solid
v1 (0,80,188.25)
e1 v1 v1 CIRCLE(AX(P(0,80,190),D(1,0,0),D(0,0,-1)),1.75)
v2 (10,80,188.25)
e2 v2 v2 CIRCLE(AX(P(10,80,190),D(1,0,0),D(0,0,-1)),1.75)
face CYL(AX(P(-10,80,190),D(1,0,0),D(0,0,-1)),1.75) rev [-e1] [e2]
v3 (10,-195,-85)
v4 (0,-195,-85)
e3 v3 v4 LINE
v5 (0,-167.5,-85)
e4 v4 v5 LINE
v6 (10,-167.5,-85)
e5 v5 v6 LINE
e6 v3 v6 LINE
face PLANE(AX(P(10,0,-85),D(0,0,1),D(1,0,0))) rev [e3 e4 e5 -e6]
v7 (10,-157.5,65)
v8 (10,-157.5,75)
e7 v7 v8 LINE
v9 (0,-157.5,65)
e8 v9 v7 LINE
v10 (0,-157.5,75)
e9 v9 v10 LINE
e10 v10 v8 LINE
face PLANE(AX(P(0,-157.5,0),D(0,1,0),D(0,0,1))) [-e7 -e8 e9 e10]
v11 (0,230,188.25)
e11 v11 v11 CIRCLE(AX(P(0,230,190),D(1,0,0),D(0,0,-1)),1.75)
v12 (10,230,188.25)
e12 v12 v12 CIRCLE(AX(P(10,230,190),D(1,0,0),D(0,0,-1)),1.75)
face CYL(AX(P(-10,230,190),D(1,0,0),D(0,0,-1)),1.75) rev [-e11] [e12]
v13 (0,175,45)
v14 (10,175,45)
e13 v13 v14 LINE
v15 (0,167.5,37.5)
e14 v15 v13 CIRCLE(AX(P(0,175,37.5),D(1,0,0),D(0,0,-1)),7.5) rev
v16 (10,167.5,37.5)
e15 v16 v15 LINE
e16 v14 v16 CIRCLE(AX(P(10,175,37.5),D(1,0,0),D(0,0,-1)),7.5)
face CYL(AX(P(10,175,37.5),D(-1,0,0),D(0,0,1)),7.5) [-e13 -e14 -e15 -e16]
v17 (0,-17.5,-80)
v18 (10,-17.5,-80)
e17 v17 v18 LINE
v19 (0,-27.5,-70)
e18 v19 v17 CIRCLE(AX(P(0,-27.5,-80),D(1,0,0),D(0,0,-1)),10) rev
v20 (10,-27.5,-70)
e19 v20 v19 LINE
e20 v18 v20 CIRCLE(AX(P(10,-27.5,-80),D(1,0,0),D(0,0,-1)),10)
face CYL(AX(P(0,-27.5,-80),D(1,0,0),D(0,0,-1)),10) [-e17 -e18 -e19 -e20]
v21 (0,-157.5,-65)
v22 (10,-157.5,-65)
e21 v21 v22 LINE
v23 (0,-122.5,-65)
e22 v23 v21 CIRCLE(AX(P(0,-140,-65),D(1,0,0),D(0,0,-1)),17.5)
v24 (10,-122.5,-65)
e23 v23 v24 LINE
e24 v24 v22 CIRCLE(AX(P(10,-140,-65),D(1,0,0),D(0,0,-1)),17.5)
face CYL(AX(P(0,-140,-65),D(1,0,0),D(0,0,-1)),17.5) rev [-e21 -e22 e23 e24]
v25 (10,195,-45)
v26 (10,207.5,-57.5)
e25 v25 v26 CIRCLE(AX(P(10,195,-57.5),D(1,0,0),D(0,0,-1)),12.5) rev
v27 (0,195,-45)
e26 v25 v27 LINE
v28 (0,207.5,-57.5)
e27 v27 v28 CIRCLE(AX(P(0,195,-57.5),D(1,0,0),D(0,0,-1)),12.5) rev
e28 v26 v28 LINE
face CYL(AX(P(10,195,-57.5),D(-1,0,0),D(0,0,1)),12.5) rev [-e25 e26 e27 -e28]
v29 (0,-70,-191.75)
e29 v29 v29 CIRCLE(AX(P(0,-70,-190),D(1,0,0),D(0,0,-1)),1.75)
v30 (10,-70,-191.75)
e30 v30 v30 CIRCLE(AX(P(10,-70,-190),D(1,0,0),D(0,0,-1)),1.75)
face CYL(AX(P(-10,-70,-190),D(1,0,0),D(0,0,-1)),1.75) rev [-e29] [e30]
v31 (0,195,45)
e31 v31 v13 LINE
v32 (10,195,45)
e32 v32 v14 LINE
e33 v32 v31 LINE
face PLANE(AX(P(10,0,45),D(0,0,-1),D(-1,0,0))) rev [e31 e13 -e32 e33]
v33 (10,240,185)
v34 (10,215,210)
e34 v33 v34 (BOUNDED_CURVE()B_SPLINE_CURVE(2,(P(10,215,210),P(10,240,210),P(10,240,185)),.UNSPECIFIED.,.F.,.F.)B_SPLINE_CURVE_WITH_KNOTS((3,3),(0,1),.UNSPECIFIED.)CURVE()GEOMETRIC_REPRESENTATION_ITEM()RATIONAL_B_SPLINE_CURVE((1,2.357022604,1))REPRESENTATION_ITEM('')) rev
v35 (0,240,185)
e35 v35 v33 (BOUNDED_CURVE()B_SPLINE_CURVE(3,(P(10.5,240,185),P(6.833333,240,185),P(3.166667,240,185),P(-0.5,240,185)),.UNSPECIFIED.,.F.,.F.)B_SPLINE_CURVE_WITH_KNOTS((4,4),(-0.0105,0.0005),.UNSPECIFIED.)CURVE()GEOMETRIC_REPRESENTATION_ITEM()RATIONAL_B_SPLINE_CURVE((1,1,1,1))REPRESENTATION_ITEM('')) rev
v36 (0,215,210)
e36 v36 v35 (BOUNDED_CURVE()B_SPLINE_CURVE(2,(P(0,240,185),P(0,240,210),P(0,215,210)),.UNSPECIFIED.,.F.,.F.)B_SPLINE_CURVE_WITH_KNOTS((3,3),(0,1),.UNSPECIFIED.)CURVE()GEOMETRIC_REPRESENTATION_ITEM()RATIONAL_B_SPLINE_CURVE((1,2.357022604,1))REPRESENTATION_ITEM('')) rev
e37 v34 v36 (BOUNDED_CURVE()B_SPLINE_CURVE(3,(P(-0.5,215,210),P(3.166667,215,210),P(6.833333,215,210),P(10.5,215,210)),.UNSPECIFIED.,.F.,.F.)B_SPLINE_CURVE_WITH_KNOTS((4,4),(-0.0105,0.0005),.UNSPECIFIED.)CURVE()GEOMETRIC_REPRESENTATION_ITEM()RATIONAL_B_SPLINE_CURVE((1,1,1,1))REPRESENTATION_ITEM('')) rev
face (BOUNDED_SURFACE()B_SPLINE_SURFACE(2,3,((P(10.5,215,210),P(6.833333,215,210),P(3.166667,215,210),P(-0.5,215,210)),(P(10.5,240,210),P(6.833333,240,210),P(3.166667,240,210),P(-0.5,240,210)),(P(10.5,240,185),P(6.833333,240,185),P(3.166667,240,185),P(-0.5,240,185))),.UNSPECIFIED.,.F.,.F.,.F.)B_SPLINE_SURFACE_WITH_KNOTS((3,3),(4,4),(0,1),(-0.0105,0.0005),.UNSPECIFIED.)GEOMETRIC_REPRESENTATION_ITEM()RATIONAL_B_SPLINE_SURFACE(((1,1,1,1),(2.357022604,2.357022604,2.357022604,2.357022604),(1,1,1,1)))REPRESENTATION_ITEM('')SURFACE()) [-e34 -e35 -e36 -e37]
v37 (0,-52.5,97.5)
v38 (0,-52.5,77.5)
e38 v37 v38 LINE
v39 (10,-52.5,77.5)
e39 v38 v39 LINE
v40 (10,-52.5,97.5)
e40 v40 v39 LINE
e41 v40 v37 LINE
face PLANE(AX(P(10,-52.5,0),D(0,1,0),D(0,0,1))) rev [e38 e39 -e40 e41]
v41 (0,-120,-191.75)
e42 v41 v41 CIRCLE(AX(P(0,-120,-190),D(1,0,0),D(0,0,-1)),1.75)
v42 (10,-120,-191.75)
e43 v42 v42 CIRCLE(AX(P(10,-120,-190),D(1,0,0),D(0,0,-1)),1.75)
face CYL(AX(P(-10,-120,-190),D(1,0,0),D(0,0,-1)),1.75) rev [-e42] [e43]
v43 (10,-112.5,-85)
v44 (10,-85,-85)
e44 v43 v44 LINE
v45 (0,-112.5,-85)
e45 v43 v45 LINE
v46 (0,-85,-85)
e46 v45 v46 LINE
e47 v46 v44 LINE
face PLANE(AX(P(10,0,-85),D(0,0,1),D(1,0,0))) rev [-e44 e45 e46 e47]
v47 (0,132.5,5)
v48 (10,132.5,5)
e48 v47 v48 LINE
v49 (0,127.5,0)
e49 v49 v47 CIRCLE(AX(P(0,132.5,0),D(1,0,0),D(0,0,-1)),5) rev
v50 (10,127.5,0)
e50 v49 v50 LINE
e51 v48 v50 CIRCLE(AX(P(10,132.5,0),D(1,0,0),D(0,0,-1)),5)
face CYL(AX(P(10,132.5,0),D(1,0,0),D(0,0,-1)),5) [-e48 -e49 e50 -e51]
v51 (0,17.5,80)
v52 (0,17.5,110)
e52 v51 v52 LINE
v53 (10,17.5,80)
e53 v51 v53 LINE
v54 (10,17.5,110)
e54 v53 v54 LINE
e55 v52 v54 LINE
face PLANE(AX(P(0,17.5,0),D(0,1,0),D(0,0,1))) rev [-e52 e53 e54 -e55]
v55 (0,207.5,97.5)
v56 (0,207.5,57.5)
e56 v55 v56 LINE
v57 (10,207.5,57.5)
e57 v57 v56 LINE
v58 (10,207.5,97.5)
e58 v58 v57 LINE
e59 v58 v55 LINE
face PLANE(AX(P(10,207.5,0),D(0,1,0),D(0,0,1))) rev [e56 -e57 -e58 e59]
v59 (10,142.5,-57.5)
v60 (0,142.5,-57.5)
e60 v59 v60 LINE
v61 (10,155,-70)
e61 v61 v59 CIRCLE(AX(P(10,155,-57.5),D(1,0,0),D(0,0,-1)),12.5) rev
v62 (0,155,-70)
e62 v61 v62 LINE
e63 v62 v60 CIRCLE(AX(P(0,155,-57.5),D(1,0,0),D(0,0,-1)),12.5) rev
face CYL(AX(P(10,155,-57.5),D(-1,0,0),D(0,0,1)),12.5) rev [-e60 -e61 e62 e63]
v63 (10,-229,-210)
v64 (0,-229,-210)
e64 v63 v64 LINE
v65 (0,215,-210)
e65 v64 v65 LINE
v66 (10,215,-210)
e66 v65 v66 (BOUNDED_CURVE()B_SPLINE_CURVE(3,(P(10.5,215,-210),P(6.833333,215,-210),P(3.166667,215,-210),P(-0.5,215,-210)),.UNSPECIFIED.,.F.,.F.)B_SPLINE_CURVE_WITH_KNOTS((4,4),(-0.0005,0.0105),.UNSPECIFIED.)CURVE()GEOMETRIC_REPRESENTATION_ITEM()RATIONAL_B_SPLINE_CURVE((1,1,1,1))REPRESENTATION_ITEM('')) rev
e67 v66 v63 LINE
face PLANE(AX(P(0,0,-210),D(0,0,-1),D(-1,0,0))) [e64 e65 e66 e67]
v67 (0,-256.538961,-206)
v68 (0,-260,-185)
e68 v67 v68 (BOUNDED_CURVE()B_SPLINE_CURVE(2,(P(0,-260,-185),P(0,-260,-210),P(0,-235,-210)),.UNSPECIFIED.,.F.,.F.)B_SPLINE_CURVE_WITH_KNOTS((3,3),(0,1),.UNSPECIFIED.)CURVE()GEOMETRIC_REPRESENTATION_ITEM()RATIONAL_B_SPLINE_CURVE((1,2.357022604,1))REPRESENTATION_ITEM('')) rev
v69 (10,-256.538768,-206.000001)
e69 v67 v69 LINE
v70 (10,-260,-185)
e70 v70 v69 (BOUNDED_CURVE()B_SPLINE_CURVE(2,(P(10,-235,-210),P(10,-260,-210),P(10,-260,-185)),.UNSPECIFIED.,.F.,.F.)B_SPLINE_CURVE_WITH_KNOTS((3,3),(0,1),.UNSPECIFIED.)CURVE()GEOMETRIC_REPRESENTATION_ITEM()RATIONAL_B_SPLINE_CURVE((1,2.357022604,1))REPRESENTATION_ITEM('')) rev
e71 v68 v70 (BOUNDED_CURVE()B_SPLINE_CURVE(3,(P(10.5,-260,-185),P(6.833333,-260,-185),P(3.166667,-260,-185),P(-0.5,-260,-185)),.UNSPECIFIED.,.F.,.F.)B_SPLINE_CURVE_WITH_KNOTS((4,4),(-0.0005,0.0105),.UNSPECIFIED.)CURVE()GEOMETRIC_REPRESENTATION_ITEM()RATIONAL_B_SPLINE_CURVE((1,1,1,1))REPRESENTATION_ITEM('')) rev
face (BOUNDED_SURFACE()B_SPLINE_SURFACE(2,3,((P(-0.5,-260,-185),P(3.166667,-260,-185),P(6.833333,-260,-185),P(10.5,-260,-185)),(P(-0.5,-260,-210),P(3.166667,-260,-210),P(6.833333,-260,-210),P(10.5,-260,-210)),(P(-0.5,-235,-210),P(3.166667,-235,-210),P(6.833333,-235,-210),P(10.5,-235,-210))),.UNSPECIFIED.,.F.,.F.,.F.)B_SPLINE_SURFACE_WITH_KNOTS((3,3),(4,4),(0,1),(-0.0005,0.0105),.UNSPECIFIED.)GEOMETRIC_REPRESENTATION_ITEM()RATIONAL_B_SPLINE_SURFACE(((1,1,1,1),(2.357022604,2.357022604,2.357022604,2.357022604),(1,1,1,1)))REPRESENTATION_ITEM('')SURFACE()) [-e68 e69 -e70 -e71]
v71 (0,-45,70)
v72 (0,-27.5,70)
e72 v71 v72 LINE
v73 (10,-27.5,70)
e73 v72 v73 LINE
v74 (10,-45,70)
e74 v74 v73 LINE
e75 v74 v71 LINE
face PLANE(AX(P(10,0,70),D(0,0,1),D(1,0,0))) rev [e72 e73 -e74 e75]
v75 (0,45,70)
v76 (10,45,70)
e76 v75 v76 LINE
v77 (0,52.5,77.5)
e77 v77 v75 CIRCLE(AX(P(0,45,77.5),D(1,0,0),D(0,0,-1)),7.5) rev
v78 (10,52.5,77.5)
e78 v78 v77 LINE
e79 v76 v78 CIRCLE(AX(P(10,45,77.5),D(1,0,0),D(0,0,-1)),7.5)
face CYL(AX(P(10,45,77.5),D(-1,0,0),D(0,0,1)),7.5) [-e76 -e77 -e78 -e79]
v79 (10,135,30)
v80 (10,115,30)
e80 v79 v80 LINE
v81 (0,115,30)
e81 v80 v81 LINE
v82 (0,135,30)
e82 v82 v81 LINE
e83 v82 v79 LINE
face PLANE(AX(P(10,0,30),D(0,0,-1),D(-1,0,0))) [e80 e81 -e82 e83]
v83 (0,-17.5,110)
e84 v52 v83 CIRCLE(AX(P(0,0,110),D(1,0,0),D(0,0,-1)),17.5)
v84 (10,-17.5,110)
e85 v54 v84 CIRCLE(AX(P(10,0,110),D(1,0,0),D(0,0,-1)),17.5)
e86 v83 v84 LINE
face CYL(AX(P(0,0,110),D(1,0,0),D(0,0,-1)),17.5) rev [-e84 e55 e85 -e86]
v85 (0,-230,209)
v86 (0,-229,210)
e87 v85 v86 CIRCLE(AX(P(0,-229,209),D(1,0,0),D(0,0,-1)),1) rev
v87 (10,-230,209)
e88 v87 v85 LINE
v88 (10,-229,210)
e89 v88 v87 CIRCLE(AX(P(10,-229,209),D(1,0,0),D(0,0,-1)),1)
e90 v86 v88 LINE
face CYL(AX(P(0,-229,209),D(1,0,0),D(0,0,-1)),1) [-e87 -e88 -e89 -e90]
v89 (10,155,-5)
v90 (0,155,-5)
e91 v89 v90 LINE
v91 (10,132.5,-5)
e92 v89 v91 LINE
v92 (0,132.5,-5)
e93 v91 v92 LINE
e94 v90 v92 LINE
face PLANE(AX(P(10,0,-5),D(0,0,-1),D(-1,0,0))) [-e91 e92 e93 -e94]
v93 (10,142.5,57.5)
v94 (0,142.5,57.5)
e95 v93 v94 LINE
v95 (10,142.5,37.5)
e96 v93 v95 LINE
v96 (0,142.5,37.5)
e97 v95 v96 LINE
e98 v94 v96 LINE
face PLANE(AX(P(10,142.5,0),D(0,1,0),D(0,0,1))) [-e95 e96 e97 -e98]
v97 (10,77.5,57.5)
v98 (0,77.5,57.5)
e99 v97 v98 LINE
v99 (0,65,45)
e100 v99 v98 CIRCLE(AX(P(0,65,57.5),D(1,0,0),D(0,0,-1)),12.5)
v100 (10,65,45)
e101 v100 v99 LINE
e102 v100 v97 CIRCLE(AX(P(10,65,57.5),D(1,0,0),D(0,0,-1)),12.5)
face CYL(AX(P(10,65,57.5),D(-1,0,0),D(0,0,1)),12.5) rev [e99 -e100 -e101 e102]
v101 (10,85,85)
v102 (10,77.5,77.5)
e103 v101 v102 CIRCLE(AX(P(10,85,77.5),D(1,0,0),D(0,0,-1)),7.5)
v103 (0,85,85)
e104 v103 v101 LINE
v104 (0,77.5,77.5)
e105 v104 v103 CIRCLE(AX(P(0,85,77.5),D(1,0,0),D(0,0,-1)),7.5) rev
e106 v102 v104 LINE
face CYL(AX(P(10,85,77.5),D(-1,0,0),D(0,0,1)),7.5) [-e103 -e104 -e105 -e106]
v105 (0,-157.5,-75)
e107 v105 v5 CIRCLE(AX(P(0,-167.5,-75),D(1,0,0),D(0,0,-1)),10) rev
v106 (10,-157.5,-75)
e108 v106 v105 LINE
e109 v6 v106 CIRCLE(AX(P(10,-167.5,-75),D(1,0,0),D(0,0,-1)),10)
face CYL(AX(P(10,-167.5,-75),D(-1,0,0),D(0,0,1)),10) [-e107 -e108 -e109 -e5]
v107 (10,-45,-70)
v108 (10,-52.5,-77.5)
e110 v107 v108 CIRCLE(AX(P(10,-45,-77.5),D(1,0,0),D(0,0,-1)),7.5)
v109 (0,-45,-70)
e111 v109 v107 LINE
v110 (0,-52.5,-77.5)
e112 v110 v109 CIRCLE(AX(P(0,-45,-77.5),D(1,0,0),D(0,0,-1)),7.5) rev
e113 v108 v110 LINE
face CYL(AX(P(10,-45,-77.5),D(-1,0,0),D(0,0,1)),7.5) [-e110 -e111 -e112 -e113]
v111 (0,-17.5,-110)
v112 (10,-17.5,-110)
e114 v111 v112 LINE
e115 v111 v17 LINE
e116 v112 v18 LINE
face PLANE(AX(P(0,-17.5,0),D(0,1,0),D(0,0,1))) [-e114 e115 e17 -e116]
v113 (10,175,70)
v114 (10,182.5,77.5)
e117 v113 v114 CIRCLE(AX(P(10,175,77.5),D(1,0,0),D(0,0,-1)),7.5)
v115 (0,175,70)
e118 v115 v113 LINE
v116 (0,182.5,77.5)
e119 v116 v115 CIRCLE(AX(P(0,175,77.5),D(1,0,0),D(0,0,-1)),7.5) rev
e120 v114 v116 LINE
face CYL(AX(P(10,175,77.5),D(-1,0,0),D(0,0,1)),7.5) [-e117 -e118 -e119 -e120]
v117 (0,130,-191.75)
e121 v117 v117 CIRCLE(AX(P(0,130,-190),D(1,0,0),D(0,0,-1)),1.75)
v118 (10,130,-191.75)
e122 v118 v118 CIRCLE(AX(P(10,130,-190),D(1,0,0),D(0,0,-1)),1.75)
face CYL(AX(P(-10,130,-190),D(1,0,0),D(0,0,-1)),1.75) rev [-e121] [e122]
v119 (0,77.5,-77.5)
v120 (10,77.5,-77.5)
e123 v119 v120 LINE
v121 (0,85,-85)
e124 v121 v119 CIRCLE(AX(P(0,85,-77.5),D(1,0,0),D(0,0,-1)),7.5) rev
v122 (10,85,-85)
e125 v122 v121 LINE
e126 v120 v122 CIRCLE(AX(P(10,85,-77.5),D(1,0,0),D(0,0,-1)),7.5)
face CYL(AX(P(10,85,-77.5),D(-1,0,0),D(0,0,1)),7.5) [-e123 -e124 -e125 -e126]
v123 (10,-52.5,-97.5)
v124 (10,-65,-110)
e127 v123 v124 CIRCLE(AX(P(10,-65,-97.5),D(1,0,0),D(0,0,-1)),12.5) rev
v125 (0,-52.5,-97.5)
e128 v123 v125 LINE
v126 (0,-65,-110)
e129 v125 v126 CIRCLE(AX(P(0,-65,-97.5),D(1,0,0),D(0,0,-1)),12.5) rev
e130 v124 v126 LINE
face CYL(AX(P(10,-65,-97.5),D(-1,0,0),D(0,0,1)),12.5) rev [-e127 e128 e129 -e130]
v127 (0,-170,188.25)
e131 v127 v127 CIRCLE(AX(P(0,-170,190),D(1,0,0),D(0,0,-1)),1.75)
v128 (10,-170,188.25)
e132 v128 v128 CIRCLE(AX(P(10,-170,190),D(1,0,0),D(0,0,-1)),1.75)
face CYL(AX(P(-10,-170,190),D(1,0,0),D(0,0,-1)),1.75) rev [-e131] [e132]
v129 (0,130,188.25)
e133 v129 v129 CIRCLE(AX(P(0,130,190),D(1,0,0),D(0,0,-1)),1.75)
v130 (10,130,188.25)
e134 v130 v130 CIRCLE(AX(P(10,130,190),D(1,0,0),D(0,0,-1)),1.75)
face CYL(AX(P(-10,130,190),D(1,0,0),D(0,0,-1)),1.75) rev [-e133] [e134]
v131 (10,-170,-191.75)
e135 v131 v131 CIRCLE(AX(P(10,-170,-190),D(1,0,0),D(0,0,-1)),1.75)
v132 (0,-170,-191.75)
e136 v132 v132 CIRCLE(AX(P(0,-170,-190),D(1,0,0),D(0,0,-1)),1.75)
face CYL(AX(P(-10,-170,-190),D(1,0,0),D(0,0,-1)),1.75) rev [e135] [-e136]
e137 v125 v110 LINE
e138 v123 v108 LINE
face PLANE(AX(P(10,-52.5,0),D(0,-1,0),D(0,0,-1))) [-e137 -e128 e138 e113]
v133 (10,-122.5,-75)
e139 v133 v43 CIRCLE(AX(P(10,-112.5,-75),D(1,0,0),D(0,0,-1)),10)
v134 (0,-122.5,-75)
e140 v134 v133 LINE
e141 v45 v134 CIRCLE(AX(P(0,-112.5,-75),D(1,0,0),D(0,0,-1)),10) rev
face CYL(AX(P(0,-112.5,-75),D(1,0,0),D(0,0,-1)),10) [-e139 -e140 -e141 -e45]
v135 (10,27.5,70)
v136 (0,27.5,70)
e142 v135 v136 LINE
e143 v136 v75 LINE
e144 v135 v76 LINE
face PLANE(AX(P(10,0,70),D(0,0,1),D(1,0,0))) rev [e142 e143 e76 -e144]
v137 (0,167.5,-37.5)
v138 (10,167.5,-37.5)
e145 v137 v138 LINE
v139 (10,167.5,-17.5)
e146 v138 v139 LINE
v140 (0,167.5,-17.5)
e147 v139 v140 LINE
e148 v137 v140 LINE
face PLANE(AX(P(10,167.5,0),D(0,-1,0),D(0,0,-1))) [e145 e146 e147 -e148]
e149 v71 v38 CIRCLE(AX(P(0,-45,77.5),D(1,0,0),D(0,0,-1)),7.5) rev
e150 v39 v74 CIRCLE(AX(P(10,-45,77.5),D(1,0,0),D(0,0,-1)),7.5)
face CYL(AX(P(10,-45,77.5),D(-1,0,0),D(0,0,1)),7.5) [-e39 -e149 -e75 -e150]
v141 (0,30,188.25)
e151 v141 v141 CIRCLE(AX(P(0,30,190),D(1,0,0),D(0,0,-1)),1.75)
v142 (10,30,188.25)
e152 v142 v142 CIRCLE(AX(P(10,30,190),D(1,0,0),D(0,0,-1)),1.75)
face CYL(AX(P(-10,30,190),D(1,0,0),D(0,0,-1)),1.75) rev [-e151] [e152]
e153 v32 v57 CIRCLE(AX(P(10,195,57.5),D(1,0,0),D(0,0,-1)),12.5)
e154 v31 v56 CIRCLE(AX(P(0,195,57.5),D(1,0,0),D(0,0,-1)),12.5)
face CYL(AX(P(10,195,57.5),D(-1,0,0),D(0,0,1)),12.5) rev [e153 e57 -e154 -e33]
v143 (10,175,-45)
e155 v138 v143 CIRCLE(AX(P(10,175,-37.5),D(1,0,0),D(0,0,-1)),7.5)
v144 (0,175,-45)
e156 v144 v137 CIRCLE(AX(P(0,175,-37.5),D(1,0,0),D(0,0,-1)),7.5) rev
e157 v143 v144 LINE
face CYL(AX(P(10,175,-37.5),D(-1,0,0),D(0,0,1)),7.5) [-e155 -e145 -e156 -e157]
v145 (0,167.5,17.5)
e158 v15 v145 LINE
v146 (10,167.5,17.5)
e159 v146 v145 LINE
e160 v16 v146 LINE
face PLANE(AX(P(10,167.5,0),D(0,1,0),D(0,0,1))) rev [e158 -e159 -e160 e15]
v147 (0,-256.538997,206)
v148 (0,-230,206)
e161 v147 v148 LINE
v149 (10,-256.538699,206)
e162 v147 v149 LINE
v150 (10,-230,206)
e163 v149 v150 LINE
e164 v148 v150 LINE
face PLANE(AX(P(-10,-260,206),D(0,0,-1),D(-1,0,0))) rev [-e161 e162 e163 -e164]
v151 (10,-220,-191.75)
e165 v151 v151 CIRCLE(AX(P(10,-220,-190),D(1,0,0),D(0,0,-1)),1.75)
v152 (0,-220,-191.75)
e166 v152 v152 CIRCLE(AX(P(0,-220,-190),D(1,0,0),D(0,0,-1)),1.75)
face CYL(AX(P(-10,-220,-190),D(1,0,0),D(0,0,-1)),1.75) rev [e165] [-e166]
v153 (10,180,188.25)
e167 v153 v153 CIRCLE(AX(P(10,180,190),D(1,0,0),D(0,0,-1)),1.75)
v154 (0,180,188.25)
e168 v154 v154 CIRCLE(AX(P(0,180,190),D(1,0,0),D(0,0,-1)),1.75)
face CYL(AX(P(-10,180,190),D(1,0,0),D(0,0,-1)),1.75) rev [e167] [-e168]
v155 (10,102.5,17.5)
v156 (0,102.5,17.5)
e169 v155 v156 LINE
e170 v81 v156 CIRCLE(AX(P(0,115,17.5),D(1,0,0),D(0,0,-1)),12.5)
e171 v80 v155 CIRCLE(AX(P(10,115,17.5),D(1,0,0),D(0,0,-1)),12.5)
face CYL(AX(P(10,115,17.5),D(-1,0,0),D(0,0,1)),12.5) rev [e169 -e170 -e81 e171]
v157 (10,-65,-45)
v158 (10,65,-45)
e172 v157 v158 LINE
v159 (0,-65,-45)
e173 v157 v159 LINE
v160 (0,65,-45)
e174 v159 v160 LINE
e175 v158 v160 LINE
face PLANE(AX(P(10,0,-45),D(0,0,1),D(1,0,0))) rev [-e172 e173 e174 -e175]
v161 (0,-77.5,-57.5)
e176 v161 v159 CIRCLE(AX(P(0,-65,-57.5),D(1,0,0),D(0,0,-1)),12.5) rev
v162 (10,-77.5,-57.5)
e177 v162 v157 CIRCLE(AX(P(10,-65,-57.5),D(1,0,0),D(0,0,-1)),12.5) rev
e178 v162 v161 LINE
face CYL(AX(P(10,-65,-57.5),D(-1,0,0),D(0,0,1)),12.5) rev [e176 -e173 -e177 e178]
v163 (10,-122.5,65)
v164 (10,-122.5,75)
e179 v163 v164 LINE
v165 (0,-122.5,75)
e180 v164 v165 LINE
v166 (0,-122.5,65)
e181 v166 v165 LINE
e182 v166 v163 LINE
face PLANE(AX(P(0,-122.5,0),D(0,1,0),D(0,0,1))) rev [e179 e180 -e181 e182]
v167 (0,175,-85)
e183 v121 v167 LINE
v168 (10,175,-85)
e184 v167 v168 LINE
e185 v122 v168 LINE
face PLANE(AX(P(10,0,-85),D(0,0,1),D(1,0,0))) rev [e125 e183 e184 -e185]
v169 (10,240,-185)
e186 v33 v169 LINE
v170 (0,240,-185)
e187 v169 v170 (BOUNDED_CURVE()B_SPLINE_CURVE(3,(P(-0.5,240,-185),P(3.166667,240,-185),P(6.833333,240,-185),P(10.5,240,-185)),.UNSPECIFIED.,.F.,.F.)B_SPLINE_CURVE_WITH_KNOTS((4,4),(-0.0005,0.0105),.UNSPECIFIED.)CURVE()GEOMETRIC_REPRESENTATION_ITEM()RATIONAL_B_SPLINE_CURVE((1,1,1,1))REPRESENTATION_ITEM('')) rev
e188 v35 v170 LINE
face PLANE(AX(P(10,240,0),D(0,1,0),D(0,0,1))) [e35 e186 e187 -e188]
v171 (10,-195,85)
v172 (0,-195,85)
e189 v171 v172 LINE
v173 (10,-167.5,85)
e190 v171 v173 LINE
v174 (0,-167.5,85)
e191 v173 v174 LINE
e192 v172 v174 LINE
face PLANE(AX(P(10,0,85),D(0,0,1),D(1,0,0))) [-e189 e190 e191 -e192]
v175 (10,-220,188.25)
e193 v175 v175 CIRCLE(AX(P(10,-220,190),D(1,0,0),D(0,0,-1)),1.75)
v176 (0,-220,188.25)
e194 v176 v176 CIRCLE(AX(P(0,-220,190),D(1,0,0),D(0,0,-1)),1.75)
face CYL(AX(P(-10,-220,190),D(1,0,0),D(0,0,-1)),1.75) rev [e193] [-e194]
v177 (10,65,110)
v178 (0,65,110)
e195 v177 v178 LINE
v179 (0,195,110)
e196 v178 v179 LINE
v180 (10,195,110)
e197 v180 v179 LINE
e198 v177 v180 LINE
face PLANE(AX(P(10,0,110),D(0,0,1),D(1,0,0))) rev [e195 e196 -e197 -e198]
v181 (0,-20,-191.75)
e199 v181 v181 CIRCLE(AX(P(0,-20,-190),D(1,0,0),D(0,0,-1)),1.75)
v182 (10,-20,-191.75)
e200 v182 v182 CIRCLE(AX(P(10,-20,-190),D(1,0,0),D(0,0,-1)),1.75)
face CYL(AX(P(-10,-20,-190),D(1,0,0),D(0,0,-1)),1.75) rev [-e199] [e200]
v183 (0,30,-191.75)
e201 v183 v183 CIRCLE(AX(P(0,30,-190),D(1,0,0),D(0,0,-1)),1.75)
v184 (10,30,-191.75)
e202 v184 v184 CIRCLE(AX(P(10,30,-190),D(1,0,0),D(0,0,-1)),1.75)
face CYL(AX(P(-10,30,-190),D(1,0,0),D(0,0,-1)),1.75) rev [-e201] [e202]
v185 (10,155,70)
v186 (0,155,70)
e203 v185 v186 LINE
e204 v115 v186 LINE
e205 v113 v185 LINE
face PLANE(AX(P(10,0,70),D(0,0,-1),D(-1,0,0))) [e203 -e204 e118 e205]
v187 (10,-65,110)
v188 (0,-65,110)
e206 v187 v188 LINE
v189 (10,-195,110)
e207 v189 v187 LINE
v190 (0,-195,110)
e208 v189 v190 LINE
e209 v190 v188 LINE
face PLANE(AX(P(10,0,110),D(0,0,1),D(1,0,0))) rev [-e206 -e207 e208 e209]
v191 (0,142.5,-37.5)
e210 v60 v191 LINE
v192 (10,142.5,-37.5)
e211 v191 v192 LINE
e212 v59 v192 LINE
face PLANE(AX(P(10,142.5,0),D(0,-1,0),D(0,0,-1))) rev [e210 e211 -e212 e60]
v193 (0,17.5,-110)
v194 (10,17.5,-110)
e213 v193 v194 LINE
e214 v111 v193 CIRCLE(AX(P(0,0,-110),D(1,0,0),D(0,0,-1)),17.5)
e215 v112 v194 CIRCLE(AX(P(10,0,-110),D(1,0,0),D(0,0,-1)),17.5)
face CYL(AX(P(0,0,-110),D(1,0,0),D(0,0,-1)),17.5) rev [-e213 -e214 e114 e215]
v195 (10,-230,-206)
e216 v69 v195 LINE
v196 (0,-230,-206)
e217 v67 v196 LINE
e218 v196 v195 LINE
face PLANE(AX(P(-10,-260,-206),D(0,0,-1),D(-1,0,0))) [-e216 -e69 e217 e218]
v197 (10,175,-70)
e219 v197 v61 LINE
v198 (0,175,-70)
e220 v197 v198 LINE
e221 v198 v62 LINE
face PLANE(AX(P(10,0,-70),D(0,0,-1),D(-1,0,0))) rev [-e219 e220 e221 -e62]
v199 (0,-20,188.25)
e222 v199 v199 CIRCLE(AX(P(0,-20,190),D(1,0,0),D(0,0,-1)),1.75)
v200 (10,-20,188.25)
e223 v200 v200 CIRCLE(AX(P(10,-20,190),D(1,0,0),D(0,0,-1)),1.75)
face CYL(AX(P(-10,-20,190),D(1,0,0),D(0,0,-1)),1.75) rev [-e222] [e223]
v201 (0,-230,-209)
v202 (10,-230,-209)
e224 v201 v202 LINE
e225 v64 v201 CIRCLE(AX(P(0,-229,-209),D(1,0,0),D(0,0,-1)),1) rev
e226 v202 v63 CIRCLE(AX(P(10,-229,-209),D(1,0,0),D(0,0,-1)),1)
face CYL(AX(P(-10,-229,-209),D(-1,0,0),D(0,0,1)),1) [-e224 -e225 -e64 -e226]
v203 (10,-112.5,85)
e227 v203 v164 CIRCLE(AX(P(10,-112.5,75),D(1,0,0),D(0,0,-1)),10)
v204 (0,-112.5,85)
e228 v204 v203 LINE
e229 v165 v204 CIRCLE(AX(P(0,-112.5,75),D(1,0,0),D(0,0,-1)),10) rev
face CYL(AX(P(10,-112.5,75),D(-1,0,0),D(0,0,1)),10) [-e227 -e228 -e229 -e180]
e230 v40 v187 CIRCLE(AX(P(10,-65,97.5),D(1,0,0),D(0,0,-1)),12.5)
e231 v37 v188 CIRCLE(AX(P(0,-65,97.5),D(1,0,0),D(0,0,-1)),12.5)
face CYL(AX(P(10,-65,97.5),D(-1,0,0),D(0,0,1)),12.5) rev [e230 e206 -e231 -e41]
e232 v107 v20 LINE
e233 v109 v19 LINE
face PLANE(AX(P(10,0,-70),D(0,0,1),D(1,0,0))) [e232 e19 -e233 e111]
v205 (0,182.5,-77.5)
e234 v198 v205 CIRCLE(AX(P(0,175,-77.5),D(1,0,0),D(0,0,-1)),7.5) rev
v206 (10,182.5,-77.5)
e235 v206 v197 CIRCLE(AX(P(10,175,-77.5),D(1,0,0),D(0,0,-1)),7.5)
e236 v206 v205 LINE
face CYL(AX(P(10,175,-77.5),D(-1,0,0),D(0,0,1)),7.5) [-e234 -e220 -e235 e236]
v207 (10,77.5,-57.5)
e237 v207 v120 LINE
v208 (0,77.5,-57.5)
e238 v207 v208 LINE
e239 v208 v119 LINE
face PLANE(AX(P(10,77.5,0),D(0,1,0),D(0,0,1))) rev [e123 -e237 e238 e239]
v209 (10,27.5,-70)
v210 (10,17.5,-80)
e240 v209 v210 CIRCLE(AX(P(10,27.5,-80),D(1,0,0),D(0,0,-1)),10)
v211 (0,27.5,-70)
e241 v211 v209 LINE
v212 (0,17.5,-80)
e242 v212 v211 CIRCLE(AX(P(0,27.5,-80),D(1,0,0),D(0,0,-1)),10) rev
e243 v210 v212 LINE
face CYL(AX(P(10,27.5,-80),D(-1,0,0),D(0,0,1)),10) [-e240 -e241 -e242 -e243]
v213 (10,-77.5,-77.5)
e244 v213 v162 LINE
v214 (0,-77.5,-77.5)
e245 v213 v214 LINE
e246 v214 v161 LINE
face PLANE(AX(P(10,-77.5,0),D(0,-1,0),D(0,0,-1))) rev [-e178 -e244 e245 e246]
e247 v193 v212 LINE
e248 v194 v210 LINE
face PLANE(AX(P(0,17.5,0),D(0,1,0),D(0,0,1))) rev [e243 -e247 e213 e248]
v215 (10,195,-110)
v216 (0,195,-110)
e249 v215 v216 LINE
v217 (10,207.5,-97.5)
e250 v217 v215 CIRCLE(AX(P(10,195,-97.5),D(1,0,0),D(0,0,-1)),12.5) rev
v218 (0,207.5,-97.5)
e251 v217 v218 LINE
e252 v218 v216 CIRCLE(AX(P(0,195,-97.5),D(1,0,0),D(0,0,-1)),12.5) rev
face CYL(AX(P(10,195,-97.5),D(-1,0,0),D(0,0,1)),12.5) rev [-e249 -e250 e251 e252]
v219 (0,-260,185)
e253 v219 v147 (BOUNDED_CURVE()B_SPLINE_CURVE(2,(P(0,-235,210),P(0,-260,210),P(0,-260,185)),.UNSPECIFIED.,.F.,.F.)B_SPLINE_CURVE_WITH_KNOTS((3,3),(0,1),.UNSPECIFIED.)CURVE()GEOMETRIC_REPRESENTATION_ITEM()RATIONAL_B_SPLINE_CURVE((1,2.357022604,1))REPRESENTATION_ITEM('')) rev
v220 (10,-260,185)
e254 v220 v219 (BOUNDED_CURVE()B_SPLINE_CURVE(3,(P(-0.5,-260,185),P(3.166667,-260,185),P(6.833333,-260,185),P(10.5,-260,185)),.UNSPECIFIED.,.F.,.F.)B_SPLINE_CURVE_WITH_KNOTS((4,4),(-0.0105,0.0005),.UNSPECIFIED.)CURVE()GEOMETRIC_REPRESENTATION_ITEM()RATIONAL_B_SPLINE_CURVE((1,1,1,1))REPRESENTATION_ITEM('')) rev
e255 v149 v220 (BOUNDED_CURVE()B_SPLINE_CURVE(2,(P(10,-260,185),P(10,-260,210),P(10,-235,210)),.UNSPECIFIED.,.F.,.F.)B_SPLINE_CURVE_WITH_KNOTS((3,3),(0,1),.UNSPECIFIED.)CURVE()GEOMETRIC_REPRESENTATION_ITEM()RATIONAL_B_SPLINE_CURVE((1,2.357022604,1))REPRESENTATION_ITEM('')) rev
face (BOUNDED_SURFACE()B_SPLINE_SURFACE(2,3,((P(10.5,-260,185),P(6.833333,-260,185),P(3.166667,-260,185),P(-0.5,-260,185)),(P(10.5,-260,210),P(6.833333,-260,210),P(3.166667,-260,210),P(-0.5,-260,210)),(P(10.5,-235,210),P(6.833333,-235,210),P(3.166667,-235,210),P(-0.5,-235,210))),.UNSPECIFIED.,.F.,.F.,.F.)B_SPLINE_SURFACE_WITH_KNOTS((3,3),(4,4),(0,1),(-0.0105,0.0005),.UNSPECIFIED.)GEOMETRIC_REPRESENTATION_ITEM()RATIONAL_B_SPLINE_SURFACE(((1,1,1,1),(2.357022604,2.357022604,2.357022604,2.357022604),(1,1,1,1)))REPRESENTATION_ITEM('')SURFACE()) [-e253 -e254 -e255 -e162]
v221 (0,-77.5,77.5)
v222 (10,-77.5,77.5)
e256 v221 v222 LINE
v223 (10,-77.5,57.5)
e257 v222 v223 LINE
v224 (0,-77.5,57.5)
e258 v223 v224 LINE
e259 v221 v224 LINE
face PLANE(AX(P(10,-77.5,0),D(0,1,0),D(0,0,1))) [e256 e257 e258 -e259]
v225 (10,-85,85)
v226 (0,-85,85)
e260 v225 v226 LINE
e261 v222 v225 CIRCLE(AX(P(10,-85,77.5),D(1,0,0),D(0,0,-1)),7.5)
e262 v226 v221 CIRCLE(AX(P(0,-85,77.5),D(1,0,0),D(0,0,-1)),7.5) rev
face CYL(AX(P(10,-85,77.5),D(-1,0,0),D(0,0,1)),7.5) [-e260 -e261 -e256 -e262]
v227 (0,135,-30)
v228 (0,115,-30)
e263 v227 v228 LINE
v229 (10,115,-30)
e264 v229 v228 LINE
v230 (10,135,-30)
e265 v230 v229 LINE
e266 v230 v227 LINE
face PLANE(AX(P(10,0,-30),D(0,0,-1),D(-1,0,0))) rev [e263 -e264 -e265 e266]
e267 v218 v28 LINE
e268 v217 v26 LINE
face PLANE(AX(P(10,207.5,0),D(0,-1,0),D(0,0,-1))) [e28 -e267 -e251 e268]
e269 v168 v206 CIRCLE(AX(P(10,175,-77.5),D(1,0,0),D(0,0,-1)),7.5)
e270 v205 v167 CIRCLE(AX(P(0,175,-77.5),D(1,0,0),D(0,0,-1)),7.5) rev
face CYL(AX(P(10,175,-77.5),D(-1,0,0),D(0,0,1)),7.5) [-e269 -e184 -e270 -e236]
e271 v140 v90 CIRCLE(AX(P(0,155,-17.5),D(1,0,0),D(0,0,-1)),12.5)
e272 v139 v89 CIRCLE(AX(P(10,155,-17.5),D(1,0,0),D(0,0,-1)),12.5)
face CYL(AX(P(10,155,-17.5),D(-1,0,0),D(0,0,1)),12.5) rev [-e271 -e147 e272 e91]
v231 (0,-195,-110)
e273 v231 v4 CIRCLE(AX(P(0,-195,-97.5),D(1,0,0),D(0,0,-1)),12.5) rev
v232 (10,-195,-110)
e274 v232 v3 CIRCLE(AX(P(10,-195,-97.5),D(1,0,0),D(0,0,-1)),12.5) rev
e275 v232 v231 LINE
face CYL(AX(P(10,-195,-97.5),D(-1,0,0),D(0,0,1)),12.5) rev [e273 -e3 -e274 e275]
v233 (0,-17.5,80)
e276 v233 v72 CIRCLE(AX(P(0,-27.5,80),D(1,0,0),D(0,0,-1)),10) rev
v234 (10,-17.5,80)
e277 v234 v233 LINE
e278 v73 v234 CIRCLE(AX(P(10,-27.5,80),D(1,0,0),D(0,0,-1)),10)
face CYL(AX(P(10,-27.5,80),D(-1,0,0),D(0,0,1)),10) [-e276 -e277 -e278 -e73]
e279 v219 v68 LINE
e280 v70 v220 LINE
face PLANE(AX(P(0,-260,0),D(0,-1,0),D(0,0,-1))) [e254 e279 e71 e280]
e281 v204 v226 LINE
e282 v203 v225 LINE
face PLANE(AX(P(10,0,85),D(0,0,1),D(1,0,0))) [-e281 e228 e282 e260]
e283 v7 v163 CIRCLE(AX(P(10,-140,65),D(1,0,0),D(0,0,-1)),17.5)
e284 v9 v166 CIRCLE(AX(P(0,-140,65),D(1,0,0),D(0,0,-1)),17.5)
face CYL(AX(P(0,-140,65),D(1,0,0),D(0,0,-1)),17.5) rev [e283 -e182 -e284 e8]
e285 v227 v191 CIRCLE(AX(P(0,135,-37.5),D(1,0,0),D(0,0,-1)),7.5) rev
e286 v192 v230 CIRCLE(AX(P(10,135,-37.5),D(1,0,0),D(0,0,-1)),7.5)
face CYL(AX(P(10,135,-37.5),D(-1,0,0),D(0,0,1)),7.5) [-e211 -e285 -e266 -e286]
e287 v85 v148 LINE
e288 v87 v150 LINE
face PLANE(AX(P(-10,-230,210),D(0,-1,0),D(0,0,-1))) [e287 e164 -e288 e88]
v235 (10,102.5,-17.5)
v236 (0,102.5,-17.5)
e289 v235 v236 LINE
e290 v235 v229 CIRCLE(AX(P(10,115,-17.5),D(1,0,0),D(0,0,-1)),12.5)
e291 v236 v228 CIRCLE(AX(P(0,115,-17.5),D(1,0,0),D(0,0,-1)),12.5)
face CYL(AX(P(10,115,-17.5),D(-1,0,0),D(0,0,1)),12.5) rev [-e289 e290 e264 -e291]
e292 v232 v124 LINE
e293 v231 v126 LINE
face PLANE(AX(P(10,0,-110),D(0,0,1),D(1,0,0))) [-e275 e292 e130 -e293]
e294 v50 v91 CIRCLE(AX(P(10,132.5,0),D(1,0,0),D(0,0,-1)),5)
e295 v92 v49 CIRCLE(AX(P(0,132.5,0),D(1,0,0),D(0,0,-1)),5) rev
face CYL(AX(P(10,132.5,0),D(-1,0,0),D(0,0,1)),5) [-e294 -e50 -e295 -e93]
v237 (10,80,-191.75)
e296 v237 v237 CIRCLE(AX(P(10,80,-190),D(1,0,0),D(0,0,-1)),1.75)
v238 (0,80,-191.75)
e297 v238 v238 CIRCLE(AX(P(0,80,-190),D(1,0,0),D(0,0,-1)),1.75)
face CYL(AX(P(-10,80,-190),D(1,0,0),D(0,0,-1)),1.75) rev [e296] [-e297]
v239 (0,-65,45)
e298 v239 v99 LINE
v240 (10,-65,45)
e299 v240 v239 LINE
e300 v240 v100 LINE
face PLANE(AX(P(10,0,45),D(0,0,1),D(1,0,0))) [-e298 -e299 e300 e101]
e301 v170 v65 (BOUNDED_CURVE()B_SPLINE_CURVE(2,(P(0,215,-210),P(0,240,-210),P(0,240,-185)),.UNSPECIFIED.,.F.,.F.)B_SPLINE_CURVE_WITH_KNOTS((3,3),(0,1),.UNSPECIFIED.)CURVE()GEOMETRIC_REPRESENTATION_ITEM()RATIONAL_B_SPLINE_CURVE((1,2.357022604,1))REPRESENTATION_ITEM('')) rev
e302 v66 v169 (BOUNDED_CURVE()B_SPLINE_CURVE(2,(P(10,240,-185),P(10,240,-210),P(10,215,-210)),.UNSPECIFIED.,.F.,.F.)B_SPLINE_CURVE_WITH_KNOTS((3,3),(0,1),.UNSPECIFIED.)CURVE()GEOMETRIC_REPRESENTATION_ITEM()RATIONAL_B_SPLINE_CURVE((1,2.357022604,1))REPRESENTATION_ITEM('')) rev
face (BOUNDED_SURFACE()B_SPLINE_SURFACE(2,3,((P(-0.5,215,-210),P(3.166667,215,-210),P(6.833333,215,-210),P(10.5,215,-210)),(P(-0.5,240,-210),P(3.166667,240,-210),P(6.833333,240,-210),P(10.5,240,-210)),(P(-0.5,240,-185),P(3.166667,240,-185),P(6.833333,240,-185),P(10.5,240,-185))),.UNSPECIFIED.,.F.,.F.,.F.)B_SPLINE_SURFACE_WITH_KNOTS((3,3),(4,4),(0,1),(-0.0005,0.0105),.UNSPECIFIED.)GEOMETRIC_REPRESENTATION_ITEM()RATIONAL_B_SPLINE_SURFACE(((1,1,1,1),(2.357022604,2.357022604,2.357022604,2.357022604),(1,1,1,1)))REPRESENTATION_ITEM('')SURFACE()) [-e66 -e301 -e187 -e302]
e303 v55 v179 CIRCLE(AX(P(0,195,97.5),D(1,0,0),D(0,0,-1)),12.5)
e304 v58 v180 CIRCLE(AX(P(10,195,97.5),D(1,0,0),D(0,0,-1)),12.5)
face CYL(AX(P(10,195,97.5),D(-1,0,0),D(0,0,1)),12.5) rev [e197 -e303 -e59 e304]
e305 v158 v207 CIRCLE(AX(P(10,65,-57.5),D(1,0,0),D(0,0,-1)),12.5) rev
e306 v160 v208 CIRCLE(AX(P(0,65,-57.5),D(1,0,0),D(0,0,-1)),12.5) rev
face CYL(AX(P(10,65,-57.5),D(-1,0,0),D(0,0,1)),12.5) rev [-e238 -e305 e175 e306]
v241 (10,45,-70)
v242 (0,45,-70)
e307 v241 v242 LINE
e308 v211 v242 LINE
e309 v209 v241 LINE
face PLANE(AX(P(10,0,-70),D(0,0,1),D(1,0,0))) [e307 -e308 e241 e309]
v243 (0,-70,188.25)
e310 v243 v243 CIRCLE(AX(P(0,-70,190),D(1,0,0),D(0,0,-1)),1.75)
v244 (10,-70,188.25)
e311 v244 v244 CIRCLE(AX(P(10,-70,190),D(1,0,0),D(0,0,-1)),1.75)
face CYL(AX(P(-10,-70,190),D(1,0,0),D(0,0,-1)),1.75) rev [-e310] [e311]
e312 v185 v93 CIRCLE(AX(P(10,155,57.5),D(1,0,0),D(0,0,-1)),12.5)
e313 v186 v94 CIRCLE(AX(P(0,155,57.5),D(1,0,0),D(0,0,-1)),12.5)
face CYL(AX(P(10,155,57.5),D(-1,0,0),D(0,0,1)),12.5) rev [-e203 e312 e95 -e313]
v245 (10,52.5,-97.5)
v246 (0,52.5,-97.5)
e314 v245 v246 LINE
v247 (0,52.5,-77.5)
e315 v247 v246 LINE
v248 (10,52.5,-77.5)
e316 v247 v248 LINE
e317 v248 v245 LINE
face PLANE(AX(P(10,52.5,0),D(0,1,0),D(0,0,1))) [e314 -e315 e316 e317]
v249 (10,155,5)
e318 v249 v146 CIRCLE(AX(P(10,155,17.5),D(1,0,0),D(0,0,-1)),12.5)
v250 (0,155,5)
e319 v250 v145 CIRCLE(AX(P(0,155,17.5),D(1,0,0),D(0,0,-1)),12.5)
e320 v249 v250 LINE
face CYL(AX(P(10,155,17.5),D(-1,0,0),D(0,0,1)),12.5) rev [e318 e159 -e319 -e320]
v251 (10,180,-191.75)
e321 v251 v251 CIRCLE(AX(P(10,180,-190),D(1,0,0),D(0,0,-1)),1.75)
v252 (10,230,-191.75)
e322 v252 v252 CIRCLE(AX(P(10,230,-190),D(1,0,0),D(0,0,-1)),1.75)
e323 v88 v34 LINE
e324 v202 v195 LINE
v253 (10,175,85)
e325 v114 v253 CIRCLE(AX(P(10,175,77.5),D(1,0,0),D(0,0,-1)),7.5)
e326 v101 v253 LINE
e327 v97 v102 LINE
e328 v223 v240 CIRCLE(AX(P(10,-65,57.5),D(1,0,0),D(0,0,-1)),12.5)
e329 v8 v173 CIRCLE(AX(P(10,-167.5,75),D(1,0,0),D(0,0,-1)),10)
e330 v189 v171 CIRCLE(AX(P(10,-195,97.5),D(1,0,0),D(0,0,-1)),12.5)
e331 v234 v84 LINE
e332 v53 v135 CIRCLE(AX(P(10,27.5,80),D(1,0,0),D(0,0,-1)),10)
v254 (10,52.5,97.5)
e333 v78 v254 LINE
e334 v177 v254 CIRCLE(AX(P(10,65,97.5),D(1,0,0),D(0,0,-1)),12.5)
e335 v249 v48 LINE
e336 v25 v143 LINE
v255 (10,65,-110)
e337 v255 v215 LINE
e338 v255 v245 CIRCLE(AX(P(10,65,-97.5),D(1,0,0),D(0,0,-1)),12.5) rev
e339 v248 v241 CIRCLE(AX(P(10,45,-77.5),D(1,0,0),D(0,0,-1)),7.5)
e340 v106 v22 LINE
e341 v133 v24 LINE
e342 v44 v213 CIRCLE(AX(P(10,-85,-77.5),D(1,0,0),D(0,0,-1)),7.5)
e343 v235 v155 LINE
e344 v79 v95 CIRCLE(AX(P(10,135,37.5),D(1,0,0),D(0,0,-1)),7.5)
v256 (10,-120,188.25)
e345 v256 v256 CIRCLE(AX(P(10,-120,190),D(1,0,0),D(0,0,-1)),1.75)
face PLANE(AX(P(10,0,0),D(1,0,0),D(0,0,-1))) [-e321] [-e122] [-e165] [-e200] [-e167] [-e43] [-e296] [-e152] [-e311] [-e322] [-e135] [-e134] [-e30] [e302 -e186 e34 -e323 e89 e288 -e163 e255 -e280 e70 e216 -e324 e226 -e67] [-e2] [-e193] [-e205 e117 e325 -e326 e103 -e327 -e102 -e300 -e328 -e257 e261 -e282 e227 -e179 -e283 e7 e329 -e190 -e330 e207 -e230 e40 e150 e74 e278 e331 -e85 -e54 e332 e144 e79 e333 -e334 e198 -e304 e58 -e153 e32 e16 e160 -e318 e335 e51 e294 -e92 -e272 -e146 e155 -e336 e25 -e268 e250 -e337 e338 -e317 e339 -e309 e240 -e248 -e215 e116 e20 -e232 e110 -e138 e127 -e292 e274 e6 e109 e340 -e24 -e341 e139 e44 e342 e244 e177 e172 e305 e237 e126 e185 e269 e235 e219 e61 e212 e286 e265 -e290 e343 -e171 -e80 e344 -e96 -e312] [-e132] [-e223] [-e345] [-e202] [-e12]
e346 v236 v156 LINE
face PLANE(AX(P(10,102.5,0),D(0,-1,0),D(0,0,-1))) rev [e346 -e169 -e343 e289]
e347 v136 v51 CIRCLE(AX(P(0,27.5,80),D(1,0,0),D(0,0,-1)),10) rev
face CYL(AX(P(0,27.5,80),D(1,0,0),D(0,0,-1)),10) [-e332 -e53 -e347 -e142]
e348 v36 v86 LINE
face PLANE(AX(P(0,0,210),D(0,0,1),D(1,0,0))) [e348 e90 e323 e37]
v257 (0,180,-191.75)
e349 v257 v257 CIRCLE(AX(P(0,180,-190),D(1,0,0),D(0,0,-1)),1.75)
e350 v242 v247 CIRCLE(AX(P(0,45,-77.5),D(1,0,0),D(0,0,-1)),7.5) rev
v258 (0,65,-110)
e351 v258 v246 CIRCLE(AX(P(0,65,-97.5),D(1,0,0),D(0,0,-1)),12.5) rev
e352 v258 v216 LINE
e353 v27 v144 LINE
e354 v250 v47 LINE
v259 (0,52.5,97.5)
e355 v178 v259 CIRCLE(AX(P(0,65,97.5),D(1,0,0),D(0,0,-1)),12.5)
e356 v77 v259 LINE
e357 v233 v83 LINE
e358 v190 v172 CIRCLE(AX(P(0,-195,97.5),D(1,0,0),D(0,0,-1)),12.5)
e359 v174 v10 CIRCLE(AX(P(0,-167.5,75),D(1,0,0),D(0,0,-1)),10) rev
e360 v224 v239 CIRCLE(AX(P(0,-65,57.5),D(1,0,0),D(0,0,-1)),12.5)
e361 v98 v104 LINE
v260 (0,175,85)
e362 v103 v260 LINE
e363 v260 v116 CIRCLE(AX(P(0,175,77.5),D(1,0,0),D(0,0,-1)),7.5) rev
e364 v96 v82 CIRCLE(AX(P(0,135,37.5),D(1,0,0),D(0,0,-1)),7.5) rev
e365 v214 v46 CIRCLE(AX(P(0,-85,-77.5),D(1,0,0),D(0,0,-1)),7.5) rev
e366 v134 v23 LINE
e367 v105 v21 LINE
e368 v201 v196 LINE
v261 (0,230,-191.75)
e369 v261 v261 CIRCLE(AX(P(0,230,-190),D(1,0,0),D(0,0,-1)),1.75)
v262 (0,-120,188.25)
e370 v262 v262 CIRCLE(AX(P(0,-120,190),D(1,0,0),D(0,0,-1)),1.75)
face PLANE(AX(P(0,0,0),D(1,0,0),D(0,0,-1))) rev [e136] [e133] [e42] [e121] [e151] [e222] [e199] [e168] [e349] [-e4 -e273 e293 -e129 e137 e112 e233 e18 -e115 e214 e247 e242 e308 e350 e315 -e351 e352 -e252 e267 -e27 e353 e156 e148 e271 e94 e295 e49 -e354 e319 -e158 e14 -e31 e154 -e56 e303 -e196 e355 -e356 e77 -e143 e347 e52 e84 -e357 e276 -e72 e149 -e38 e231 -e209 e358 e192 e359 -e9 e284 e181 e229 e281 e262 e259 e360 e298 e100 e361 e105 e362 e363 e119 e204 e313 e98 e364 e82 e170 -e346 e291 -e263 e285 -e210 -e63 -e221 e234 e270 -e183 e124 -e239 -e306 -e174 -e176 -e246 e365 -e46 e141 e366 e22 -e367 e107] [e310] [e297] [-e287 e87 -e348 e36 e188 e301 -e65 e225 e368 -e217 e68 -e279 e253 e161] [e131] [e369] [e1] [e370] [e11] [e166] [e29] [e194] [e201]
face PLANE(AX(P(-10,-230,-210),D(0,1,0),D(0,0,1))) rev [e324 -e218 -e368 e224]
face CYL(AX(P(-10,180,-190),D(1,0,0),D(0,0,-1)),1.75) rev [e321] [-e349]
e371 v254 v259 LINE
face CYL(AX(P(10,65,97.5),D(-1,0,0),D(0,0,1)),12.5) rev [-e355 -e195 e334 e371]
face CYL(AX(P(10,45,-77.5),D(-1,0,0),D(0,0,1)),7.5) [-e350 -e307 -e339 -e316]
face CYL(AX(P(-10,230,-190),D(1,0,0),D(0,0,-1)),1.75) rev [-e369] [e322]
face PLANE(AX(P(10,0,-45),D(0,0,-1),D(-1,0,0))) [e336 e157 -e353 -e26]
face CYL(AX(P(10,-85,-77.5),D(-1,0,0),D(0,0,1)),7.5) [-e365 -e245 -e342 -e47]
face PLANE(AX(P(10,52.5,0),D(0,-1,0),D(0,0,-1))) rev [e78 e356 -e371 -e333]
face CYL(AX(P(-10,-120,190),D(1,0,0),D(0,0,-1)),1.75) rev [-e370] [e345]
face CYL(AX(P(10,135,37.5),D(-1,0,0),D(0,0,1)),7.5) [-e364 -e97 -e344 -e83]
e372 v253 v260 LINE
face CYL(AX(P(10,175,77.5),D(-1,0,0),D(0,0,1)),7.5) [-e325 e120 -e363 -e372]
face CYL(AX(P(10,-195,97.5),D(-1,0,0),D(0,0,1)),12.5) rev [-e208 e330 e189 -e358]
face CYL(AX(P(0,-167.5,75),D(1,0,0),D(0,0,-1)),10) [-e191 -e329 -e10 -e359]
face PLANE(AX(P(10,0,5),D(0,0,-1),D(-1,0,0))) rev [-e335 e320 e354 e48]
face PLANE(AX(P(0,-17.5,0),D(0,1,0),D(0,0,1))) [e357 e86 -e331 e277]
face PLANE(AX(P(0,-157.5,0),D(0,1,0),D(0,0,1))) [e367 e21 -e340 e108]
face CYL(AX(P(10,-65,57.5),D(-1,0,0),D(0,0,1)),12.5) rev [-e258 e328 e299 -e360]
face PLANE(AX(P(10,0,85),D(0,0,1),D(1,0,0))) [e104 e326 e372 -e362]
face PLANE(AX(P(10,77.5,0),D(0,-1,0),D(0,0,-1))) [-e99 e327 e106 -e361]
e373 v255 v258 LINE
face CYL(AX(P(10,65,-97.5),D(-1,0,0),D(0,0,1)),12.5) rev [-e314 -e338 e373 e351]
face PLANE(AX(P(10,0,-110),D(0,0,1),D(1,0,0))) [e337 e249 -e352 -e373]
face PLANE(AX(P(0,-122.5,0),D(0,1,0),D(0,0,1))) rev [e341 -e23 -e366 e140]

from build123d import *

# Parameters (mm, degrees)
SKETCH_5_W          = 240
SKETCH_5_H          = 480
EXTRUDE_4_DEPTH     = 10
FILLET_1_R          = 7.5
FILLET_2_R          = 5
SKETCH_6_W          = 10
SKETCH_6_H          = 480
EXTRUDE_5_DEPTH     = 90
SKETCH_7_W          = 10
SKETCH_7_H          = 480
EXTRUDE_6_DEPTH     = 90
SKETCH_8_W          = 10
SKETCH_8_H          = 420
EXTRUDE_7_DEPTH     = 20
FILLET_4_SIZE       = 25
SKETCH_9_R          = 1.75
CUT_EXTRUDE_1_DEPTH = 20
SKETCH_10_W         = 4
SKETCH_10_H         = 30
CUT_EXTRUDE_2_DEPTH = 20
FILLET_5_R          = 1
FILLET_6_R          = 1
CUT_EXTRUDE_3_DEPTH = 10
FILLET_7_R          = 10


# Some blends are built 0.0001 mm under size
with BuildPart() as part:
    # 草图5 → 凸台-拉伸4 (new body)
    with BuildSketch(Plane(origin=(0, 0, 0), x_dir=(0, 0, -1), z_dir=(1, 0, 0))):
        Rectangle(SKETCH_5_W, SKETCH_5_H)
        with BuildLine():
            ThreePointArc((-85, -195), (-97.5, -207.5), (-110, -195))
            Line((-110, -195), (-110, -65))
            ThreePointArc((-110, -65), (-106.338834765, -56.161165235), (-97.5, -52.5))
            Line((-97.5, -52.5), (-70, -52.5))
            Line((-70, -52.5), (-70, 52.5))
            Line((-70, 52.5), (-97.5, 52.5))
            ThreePointArc((-97.5, 52.5), (-106.338834765, 56.161165235), (-110, 65))
            Line((-110, 65), (-110, 195))
            ThreePointArc((-110, 195), (-106.338834765, 203.838834765), (-97.5, 207.5))
            Line((-97.5, 207.5), (-57.5, 207.5))
            ThreePointArc((-57.5, 207.5), (-48.661165235, 203.838834765), (-45, 195))
            Line((-45, 195), (-45, 167.5))
            Line((-45, 167.5), (-17.5, 167.5))
            ThreePointArc((-17.5, 167.5), (-8.661165235, 163.838834765), (-5, 155))
            Line((-5, 155), (-5, 127.5))
            Line((-5, 127.5), (5, 127.5))
            Line((5, 127.5), (5, 155))
            ThreePointArc((5, 155), (8.661165235, 163.838834765), (17.5, 167.5))
            Line((17.5, 167.5), (45, 167.5))
            Line((45, 167.5), (45, 195))
            ThreePointArc((45, 195), (48.661165235, 203.838834765), (57.5, 207.5))
            Line((57.5, 207.5), (97.5, 207.5))
            ThreePointArc((97.5, 207.5), (106.338834765, 203.838834765), (110, 195))
            Line((110, 195), (110, 65))
            ThreePointArc((110, 65), (106.338834765, 56.161165235), (97.5, 52.5))
            Line((97.5, 52.5), (70, 52.5))
            Line((70, 52.5), (70, -52.5))
            Line((70, -52.5), (97.5, -52.5))
            ThreePointArc((97.5, -52.5), (106.338834765, -56.161165235), (110, -65))
            Line((110, -65), (110, -195))
            ThreePointArc((110, -195), (97.5, -207.5), (85, -195))
            Line((85, -195), (85, -77.5))
            Line((85, -77.5), (57.5, -77.5))
            ThreePointArc((57.5, -77.5), (48.661165235, -73.838834765), (45, -65))
            Line((45, -65), (45, 65))
            ThreePointArc((45, 65), (48.661165235, 73.838834765), (57.5, 77.5))
            Line((57.5, 77.5), (85, 77.5))
            Line((85, 77.5), (85, 182.5))
            Line((85, 182.5), (70, 182.5))
            Line((70, 182.5), (70, 155))
            ThreePointArc((70, 155), (66.338834765, 146.161165235), (57.5, 142.5))
            Line((57.5, 142.5), (30, 142.5))
            Line((30, 142.5), (30, 115))
            ThreePointArc((30, 115), (26.338834765, 106.161165235), (17.5, 102.5))
            Line((17.5, 102.5), (-17.5, 102.5))
            ThreePointArc((-17.5, 102.5), (-26.338834765, 106.161165235), (-30, 115))
            Line((-30, 115), (-30, 142.5))
            Line((-30, 142.5), (-57.5, 142.5))
            ThreePointArc((-57.5, 142.5), (-66.338834765, 146.161165235), (-70, 155))
            Line((-70, 155), (-70, 182.5))
            Line((-70, 182.5), (-85, 182.5))
            Line((-85, 182.5), (-85, 77.5))
            Line((-85, 77.5), (-57.5, 77.5))
            ThreePointArc((-57.5, 77.5), (-48.661165235, 73.838834765), (-45, 65))
            Line((-45, 65), (-45, -65))
            ThreePointArc((-45, -65), (-48.661165235, -73.838834765), (-57.5, -77.5))
            Line((-57.5, -77.5), (-85, -77.5))
            Line((-85, -77.5), (-85, -195))
        make_face(mode=Mode.SUBTRACT)
    extrude(amount=EXTRUDE_4_DEPTH)

    # 圆角1
    fillet_1_edges = [part.edges().sort_by_distance(p)[0] for p in [
        (5, -77.5, 85),
        (5, -52.5, 70),
        (5, 52.5, 70),
        (5, 77.5, 85),
        (5, 182.5, 85),
        (5, 182.5, 70),
        (5, 167.5, 45),
        (5, 142.5, 30),
        (5, 142.5, -30),
        (5, 167.5, -45),
        (5, 182.5, -70),
        (5, 182.5, -85),
        (5, 77.5, -85),
        (5, 52.5, -70),
        (5, -77.5, -85),
        (5, -52.5, -70),
    ]]
    fillet(fillet_1_edges, radius=FILLET_1_R - 0.0001)  # a hair under: the kernel refuses the full size

    # 圆角2
    fillet_2_edges = [part.edges().sort_by_distance(p)[0] for p in [
        (5, 127.5, 5),
        (5, 127.5, -5),
    ]]
    fillet(fillet_2_edges, radius=FILLET_2_R - 0.0001)  # a hair under: the kernel refuses the full size

    # 草图6 → 凸台-拉伸5 (add)
    with BuildSketch(Plane.XY.offset(120)):
        with Locations((5, 0)):
            Rectangle(SKETCH_6_W, SKETCH_6_H)
    extrude(amount=EXTRUDE_5_DEPTH)

    # 草图7 → 凸台-拉伸6 (add)
    with BuildSketch(Plane(origin=(0, 0, -120), x_dir=(-1, 0, 0), z_dir=(0, 0, -1))):
        with Locations((-5, 0)):
            Rectangle(SKETCH_7_W, SKETCH_7_H)
    extrude(amount=EXTRUDE_6_DEPTH)

    # 草图8 → 凸台-拉伸7 (add)
    with BuildSketch(Plane.XZ.offset(240)):
        with Locations((5, 0)):
            Rectangle(SKETCH_8_W, SKETCH_8_H)
    extrude(amount=EXTRUDE_7_DEPTH)

    # 圆角4
    # a fillet whose section is not a circle: 25 mm, written as the material it takes off along each edge
    with BuildSketch(Plane(origin=(72.5, -260, 210), x_dir=(0, 0, -1), z_dir=(-1, 0, 0)), Plane(origin=(-62.5, 240, -210), x_dir=(0, -1, 0), z_dir=(1, 0, 0)), Plane(origin=(72.5, 240, 210), x_dir=(0, -1, 0), z_dir=(-1, 0, 0))) as fillet_4_piece_1:
        with BuildLine():
            Bezier((FILLET_4_SIZE, 0), (0, 0), (0, -FILLET_4_SIZE), weights=[1, 2.357022604, 1])
            Line((0, -FILLET_4_SIZE), (0, 0))
            Line((0, 0), (FILLET_4_SIZE, 0))
        make_face()
    extrude(amount=135, mode=Mode.SUBTRACT)
    with BuildSketch(Plane(origin=(-62.5, -260, -210), x_dir=(0, 1, 0), z_dir=(1, 0, 0))) as fillet_4_piece_2:
        with BuildLine():
            Bezier((FILLET_4_SIZE, 0), (0, 0), (0, FILLET_4_SIZE), weights=[1, 2.357022604, 1])
            Line((0, FILLET_4_SIZE), (0, 0))
            Line((0, 0), (FILLET_4_SIZE, 0))
        make_face()
    extrude(amount=135, mode=Mode.SUBTRACT)

    # 草图9 → 切除-拉伸1 (cut)
    with BuildSketch(Plane(origin=(10, 0, 0), x_dir=(0, 0, -1), z_dir=(1, 0, 0))):
        with Locations((-190, -220)):
            Circle(SKETCH_9_R)
        with Locations((190, -220)):
            Circle(SKETCH_9_R)
        with Locations((190, -170)):
            Circle(SKETCH_9_R)
        with Locations((190, -120)):
            Circle(SKETCH_9_R)
        with Locations((190, -70)):
            Circle(SKETCH_9_R)
        with Locations((-190, -170)):
            Circle(SKETCH_9_R)
        with Locations((-190, -120)):
            Circle(SKETCH_9_R)
        with Locations((-190, -70)):
            Circle(SKETCH_9_R)
        with Locations((-190, -20)):
            Circle(SKETCH_9_R)
        with Locations((190, -20)):
            Circle(SKETCH_9_R)
        with Locations((-190, 30)):
            Circle(SKETCH_9_R)
        with Locations((190, 30)):
            Circle(SKETCH_9_R)
        with Locations((-190, 80)):
            Circle(SKETCH_9_R)
        with Locations((190, 80)):
            Circle(SKETCH_9_R)
        with Locations((-190, 130)):
            Circle(SKETCH_9_R)
        with Locations((190, 130)):
            Circle(SKETCH_9_R)
        with Locations((-190, 180)):
            Circle(SKETCH_9_R)
        with Locations((190, 180)):
            Circle(SKETCH_9_R)
        with Locations((-190, 230)):
            Circle(SKETCH_9_R)
        with Locations((190, 230)):
            Circle(SKETCH_9_R)
    extrude(amount=-CUT_EXTRUDE_1_DEPTH, mode=Mode.SUBTRACT)

    # 草图10 → 切除-拉伸2 (cut)
    with BuildSketch(Plane(origin=(10, 0, 0), x_dir=(0, 0, -1), z_dir=(1, 0, 0))):
        with Locations((-208, -245)):
            Rectangle(SKETCH_10_W, SKETCH_10_H)
    cut_extrude_2 = extrude(amount=-CUT_EXTRUDE_2_DEPTH, mode=Mode.SUBTRACT)

    # 圆角5
    fillet_5_edges = [part.edges().sort_by_distance(p)[0] for p in [
        (5, -230, 210),
    ]]
    fillet(fillet_5_edges, radius=FILLET_5_R)

    # 镜向2: 切除-拉伸2 across plane
    add(cut_extrude_2.mirror(Plane.XY), mode=Mode.SUBTRACT)

    # 圆角6
    fillet_6_edges = [part.edges().sort_by_distance(p)[0] for p in [
        (5, -230, -210),
    ]]
    fillet(fillet_6_edges, radius=FILLET_6_R)

    # 草图11 → 切除-拉伸3 (cut)
    with BuildSketch(Plane(origin=(10, 0, 0), x_dir=(0, 0, -1), z_dir=(1, 0, 0))):
        with BuildLine():
            Line((-110, -17.5), (-70, -17.5))
            Line((-70, -17.5), (-70, 17.5))
            Line((-70, 17.5), (-110, 17.5))
            ThreePointArc((-110, 17.5), (-127.5, 0), (-110, -17.5))
        make_face()
        with BuildLine():
            Line((110, 17.5), (70, 17.5))
            Line((70, 17.5), (70, -17.5))
            Line((70, -17.5), (110, -17.5))
            ThreePointArc((110, -17.5), (127.5, 0), (110, 17.5))
        make_face()
        with BuildLine():
            Line((85, -157.5), (85, -122.5))
            Line((85, -122.5), (65, -122.5))
            ThreePointArc((65, -122.5), (47.5, -140), (65, -157.5))
            Line((65, -157.5), (85, -157.5))
        make_face()
        with BuildLine():
            Line((-65, -122.5), (-85, -122.5))
            Line((-85, -122.5), (-85, -157.5))
            Line((-85, -157.5), (-65, -157.5))
            ThreePointArc((-65, -157.5), (-47.5, -140), (-65, -122.5))
        make_face()
    extrude(amount=-CUT_EXTRUDE_3_DEPTH, mode=Mode.SUBTRACT)

    # 圆角7
    fillet_7_edges = [part.edges().sort_by_distance(p)[0] for p in [
        (5, -157.5, 85),
        (5, -122.5, 85),
        (5, -122.5, -85),
        (5, -157.5, -85),
        (5, -17.5, -70),
        (5, 17.5, -70),
        (5, 17.5, 70),
        (5, -17.5, 70),
    ]]
    fillet(fillet_7_edges, radius=FILLET_7_R)


solid = part.part
